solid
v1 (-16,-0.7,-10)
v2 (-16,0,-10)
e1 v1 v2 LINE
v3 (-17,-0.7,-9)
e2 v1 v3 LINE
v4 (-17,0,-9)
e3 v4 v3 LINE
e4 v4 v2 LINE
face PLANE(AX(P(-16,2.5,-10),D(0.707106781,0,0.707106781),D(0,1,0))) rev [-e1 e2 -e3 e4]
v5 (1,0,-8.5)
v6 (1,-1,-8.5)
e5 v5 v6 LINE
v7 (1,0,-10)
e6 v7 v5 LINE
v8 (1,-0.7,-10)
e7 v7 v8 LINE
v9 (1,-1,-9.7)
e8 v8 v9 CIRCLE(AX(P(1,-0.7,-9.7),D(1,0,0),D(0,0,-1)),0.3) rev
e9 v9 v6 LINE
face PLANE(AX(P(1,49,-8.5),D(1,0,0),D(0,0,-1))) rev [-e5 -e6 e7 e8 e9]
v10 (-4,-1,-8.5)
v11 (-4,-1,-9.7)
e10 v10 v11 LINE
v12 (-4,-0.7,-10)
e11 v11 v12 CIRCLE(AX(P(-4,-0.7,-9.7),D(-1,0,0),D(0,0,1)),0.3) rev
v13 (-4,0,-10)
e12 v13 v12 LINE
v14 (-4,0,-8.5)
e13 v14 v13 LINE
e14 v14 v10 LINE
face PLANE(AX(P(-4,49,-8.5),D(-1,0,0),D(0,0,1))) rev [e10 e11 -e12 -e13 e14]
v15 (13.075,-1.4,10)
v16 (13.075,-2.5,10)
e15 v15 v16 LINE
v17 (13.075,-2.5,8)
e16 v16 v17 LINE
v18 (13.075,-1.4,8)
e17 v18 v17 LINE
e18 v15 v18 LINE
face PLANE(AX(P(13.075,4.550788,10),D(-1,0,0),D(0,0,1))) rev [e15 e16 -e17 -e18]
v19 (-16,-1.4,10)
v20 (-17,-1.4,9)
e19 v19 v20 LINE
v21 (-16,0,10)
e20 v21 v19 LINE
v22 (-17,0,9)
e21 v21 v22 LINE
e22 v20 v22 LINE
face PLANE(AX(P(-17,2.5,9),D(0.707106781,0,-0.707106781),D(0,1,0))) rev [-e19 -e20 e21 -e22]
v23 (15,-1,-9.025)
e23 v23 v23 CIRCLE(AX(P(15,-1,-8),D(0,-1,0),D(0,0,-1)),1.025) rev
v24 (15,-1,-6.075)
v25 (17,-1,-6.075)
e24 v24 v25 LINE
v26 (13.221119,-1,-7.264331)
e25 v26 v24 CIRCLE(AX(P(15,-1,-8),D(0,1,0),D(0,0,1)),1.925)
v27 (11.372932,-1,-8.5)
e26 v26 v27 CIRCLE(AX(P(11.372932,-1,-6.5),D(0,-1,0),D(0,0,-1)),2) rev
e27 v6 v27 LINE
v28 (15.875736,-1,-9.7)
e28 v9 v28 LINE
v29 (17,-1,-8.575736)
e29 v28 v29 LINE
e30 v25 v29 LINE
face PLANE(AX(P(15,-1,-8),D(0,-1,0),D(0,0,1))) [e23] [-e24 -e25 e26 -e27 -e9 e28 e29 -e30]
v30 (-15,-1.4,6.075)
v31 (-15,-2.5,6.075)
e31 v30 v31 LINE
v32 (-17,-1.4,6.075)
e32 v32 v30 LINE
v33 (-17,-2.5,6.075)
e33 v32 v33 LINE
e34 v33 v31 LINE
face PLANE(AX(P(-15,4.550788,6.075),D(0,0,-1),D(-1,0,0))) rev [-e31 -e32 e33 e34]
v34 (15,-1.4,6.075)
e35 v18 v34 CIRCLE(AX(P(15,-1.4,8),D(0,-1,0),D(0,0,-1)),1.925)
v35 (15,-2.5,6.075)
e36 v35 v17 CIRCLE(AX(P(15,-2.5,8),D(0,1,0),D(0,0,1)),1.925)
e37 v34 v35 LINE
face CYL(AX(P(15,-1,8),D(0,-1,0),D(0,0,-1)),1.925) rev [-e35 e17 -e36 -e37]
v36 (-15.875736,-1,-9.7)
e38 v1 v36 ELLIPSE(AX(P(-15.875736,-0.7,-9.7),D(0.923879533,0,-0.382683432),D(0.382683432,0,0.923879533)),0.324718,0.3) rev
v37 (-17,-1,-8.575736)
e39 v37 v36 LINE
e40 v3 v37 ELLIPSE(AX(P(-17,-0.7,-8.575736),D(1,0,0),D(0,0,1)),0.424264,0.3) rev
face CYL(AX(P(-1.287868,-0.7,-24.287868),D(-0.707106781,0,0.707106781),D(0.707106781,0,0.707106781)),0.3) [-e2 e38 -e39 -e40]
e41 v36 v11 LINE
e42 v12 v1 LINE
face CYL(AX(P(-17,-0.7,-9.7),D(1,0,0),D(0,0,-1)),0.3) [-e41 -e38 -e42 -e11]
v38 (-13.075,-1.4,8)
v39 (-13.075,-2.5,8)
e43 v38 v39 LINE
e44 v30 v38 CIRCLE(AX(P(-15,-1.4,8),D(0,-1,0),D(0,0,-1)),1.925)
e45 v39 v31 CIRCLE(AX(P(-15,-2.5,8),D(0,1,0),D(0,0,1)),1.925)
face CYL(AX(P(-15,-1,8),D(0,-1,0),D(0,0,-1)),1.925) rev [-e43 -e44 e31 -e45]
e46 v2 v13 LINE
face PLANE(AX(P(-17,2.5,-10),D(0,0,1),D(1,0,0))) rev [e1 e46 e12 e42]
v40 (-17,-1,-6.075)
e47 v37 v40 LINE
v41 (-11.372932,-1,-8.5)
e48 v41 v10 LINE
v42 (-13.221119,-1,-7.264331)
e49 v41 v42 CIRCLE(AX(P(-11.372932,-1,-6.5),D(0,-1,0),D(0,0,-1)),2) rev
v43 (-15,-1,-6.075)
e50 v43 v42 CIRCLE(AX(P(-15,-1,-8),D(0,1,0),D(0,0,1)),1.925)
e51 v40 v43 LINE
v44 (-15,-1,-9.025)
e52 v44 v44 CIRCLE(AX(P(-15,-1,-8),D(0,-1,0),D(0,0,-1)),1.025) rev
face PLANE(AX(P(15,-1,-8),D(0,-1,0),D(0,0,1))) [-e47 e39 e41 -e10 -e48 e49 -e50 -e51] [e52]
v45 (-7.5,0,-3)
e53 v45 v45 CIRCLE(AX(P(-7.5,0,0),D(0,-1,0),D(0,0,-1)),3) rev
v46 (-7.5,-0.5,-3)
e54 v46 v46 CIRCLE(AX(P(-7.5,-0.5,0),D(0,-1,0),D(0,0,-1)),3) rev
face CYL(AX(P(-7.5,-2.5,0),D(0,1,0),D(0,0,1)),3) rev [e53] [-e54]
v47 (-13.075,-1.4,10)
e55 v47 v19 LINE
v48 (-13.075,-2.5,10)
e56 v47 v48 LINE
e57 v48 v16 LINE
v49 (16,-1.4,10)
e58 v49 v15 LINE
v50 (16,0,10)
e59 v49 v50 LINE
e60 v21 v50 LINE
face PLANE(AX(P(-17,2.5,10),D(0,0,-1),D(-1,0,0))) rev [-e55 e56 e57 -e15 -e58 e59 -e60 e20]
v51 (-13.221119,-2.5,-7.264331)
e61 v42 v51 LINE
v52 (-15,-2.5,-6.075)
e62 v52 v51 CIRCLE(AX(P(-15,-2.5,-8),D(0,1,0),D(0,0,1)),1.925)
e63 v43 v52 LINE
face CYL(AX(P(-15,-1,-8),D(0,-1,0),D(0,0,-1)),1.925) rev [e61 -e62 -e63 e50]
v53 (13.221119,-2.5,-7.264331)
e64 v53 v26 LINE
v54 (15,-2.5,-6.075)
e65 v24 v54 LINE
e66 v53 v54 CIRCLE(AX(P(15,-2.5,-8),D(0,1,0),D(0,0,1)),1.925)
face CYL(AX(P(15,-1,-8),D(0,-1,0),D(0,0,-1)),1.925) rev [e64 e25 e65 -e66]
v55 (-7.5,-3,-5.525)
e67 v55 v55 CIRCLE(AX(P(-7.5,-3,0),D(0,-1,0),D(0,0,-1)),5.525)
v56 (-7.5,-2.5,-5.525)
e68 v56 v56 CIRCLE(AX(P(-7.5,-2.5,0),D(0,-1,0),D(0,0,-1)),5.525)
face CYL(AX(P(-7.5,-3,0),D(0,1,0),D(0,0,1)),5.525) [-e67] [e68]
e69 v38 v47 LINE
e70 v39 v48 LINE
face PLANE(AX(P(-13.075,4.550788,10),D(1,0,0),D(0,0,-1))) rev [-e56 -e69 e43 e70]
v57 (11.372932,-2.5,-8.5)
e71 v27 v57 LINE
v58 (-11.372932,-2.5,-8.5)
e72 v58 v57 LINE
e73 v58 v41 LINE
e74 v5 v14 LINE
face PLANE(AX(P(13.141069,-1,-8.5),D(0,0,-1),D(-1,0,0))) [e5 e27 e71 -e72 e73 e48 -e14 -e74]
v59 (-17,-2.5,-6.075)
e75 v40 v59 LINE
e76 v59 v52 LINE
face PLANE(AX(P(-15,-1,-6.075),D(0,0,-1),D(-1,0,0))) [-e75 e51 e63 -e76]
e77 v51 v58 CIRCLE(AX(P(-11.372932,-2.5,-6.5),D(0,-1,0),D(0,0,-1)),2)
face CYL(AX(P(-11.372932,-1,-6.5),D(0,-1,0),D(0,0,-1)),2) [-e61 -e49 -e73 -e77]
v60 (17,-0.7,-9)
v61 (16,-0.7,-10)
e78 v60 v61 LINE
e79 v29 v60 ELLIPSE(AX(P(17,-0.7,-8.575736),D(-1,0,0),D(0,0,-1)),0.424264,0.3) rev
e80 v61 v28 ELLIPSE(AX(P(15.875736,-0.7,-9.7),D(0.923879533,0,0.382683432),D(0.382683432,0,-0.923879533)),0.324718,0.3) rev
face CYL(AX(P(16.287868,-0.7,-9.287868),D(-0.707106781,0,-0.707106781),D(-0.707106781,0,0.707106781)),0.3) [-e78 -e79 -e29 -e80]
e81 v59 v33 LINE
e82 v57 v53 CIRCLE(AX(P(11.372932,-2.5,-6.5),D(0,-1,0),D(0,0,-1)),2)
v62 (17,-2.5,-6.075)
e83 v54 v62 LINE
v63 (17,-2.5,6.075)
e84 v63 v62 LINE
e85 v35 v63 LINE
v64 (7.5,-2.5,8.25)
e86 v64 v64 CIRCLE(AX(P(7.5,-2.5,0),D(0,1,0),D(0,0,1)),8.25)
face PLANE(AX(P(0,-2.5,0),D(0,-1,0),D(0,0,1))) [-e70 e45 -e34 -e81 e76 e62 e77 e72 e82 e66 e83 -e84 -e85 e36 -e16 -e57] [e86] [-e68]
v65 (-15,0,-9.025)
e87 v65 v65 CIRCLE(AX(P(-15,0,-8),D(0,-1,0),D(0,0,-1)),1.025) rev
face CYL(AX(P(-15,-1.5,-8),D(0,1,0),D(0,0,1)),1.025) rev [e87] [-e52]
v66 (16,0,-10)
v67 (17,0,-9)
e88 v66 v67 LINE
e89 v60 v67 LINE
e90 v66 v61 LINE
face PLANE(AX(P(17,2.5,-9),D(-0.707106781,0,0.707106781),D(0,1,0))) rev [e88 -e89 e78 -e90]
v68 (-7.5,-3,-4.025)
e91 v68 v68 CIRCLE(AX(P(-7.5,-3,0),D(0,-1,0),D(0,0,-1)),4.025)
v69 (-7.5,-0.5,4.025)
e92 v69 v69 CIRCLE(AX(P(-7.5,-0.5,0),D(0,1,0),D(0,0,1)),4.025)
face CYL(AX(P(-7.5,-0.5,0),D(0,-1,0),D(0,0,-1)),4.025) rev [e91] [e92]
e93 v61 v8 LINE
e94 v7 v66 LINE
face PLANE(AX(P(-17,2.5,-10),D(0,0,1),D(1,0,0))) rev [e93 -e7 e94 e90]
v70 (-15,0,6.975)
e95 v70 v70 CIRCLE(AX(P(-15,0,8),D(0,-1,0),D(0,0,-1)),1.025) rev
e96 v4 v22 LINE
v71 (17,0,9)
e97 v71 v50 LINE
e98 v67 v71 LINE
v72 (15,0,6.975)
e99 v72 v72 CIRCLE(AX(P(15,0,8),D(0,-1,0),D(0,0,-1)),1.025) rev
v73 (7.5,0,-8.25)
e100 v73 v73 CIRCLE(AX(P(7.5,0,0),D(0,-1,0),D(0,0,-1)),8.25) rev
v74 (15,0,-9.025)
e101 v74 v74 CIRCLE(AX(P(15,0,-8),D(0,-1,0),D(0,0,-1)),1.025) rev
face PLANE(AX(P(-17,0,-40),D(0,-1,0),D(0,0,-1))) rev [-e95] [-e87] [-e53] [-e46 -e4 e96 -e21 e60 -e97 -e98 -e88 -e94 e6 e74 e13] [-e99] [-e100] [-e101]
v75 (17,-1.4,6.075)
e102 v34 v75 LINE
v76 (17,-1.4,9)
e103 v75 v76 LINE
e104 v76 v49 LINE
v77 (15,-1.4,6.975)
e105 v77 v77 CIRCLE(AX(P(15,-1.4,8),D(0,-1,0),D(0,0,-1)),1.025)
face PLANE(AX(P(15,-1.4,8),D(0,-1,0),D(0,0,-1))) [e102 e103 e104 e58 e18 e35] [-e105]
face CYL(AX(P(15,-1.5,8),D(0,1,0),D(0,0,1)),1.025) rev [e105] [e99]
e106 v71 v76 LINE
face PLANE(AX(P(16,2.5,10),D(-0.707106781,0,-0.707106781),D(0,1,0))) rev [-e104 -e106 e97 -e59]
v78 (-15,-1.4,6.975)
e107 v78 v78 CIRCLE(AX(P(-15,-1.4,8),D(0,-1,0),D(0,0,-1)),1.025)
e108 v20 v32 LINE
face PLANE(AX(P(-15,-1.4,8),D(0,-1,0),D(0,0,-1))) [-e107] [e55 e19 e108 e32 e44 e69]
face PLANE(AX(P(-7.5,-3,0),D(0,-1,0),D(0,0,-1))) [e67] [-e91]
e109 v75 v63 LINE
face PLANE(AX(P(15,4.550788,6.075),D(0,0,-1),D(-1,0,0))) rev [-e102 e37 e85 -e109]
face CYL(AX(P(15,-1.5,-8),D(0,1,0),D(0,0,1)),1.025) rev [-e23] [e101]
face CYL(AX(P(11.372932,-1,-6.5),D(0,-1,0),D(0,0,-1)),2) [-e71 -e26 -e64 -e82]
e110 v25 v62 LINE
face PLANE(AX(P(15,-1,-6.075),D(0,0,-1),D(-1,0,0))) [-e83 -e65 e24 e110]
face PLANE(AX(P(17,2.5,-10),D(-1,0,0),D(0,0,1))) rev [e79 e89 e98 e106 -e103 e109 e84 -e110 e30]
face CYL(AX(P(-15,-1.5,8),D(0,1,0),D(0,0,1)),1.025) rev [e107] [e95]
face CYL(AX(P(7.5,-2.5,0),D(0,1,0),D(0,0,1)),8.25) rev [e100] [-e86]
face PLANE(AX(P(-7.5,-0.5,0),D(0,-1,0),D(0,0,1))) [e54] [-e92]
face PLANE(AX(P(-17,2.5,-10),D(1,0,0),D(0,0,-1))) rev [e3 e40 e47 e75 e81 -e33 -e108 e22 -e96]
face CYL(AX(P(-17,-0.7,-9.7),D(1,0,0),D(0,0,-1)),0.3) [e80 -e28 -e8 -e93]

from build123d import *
from build123d.topology import SkipClean

# Parameters (mm, degrees)
SKETCH1_W                = 34
SKETCH1_H                = 20
BOSS_EXTRUDE1_DEPTH      = 2.5
SKETCH2_R                = 3
SKETCH2_R_2              = 8.25
CUT_EXTRUDE1_DEPTH       = 5
SKETCH5_R                = 4.025
CUT_EXTRUDE4_DEPTH       = 2
SKETCH3_R                = 1.025
CUT_EXTRUDE2_DEPTH       = 4
SKETCH4_R                = 1.925
CUT_EXTRUDE3_DEPTH       = 1.5
CUT_EXTRUDE5_DEPTH       = 1.5
FILLET1_R                = 2
CHAMFER1_SIZE            = 1
FILLET2_R                = 0.3
FILLET1_OF_MIRROR1_R     = 2
CHAMFER1_OF_MIRROR1_SIZE = 1
FILLET2_OF_MIRROR1_R     = 0.3
SKETCH7_W                = 34
SKETCH7_H                = 2.5
CUT_EXTRUDE6_DEPTH       = 50
SKETCH8_W                = 5
SKETCH8_H                = 1.5
CUT_EXTRUDE7_DEPTH       = 50
BOSS_EXTRUDE2_START      = 0.5
SKETCH9_R                = 5.525
SKETCH9_R_2              = 4.025
BOSS_EXTRUDE2_DEPTH      = 0.5
CUT_EXTRUDE8_DEPTH       = 1.5
BOSS_EXTRUDE3_START      = 0.4
SKETCH11_R               = 1.025
BOSS_EXTRUDE3_DEPTH      = 0.4


with BuildPart() as part:
    # Sketch1 → Boss-Extrude1 (new body)
    with BuildSketch(Plane(origin=(0, 0, 0), x_dir=(1, 0, 0), z_dir=(0, 1, 0))):
        Rectangle(SKETCH1_W, SKETCH1_H)
    boss_extrude1 = extrude(amount=BOSS_EXTRUDE1_DEPTH)

    # Sketch2 → Cut-Extrude1 (cut)
    with BuildSketch(Plane(origin=(0, 2.5, 0), x_dir=(1, 0, 0), z_dir=(0, 1, 0))):
        with Locations(Location((-7.5, 0, 0), (0, 0, 270))):
            Circle(SKETCH2_R)
        with Locations(Location((7.5, 0, 0), (0, 0, 270))):
            Circle(SKETCH2_R_2)
    cut_extrude1 = extrude(amount=-CUT_EXTRUDE1_DEPTH, mode=Mode.SUBTRACT)

    # Sketch5 → Cut-Extrude4 (cut)
    with BuildSketch(Plane(origin=(0, 2.5, 0), x_dir=(1, 0, 0), z_dir=(0, 1, 0))):
        with Locations(Location((-7.5, 0, 0), (0, 0, 270))):
            Circle(SKETCH5_R)
    cut_extrude4 = extrude(amount=-CUT_EXTRUDE4_DEPTH, mode=Mode.SUBTRACT)

    # Sketch3 → Cut-Extrude2 (cut)
    with BuildSketch(Plane(origin=(0, 2.5, 0), x_dir=(1, 0, 0), z_dir=(0, 1, 0))):
        with Locations(Location((15, 8, 0), (0, 0, 270))):
            Circle(SKETCH3_R)
        with Locations(Location((-15, 8, 0), (0, 0, 270))):
            Circle(SKETCH3_R)
        with Locations(Location((-15, -8, 0), (0, 0, 270))):
            Circle(SKETCH3_R)
        with Locations(Location((15, -8, 0), (0, 0, 270))):
            Circle(SKETCH3_R)
    cut_extrude2 = extrude(amount=-CUT_EXTRUDE2_DEPTH, mode=Mode.SUBTRACT)

    # Sketch4 → Cut-Extrude3 (cut)
    with BuildSketch(Plane(origin=(0, 2.5, 0), x_dir=(1, 0, 0), z_dir=(0, 1, 0))):
        with Locations(Location((-15, 8, 0), (0, 0, 270))):
            Circle(SKETCH4_R)
        with Locations(Location((-15, -8, 0), (0, 0, 270))):
            Circle(SKETCH4_R)
        with Locations(Location((15, 8, 0), (0, 0, 270))):
            Circle(SKETCH4_R)
        with Locations(Location((15, -8, 0), (0, 0, 270))):
            Circle(SKETCH4_R)
    cut_extrude3 = extrude(amount=-CUT_EXTRUDE3_DEPTH, mode=Mode.SUBTRACT)

    # Sketch6 → Cut-Extrude5 (cut)
    with BuildSketch(Plane(origin=(0, 2.5, 0), x_dir=(1, 0, 0), z_dir=(0, 1, 0))):
        with BuildLine():
            Line((17, 10), (-17, 10))
            Line((-17, 10), (-17, 6.075))
            Line((-17, 6.075), (-15, 6.075))
            ThreePointArc((-15, 6.075), (-13.472236111, 6.828862732), (-13.141068855, 8.5))
            Line((-13.141068855, 8.5), (13.141068855, 8.5))
            ThreePointArc((13.141068855, 8.5), (13.472236111, 6.828862732), (15, 6.075))
            Line((15, 6.075), (17, 6.075))
            Line((17, 6.075), (17, 10))
        make_face()
    cut_extrude5 = extrude(amount=-CUT_EXTRUDE5_DEPTH, mode=Mode.SUBTRACT)

    # Fillet1
    fillet1_edges = [part.edges().sort_by_distance(p)[0] for p in [
        (13.141068855, 1.75, -8.5),
        (-13.141068855, 1.75, -8.5),
    ]]
    fillet(fillet1_edges, radius=FILLET1_R)

    # Chamfer1
    chamfer1_edges = [part.edges().sort_by_distance(p)[0] for p in [
        (17, 1.25, 10),
        (-17, 1.25, 10),
        (-17, 0.5, -10),
        (17, 0.5, -10),
    ]]
    chamfer(chamfer1_edges, length=CHAMFER1_SIZE)

    # Fillet2
    fillet2_edges = [part.edges().sort_by_distance(p)[0] for p in [
        (0, 1, -10),
        (16.5, 1, -9.5),
        (-16.5, 1, -9.5),
    ]]
    fillet(fillet2_edges, radius=FILLET2_R)


with BuildPart() as mirror1_1:
    # Mirror1: Boss-Extrude1 across plane
    add(boss_extrude1.mirror(Plane.ZX))

    # Mirror1 2: Cut-Extrude1, Cut-Extrude4, Cut-Extrude2, Cut-Extrude3, Cut-Extrude5 across plane
    add(cut_extrude1.mirror(Plane.ZX), mode=Mode.SUBTRACT)
    add(cut_extrude4.mirror(Plane.ZX), mode=Mode.SUBTRACT)
    add(cut_extrude2.mirror(Plane.ZX), mode=Mode.SUBTRACT)
    add(cut_extrude3.mirror(Plane.ZX), mode=Mode.SUBTRACT)
    add(cut_extrude5.mirror(Plane.ZX), mode=Mode.SUBTRACT)

    # Fillet1 of Mirror1
    fillet1_of_mirror1_edges = [mirror1_1.edges().sort_by_distance(p)[0] for p in [
        (13.141068855, -1.75, -8.5),
        (-13.141068855, -1.75, -8.5),
    ]]
    fillet(fillet1_of_mirror1_edges, radius=FILLET1_OF_MIRROR1_R)

    # Chamfer1 of Mirror1
    chamfer1_of_mirror1_edges = [mirror1_1.edges().sort_by_distance(p)[0] for p in [
        (17, -1.25, 10),
        (-17, -1.25, 10),
        (-17, -0.5, -10),
        (17, -0.5, -10),
    ]]
    chamfer(chamfer1_of_mirror1_edges, length=CHAMFER1_OF_MIRROR1_SIZE)

    # Fillet2 of Mirror1
    fillet2_of_mirror1_edges = [mirror1_1.edges().sort_by_distance(p)[0] for p in [
        (0, -1, -10),
        (16.5, -1, -9.5),
        (-16.5, -1, -9.5),
    ]]
    fillet(fillet2_of_mirror1_edges, radius=FILLET2_OF_MIRROR1_R)


with BuildPart() as part_1:
    add(part.part)

    # Mirror1 united with what the copies touc: union Mirror1_1
    add(mirror1_1.part)

    # Sketch7 → Cut-Extrude6 (cut)
    with BuildSketch(Plane.XY.offset(10)):
        with Locations((0, 1.25)):
            Rectangle(SKETCH7_W, SKETCH7_H)
    extrude(amount=-CUT_EXTRUDE6_DEPTH, mode=Mode.SUBTRACT)

    # Sketch8 → Cut-Extrude7 (cut)
    with BuildSketch(Plane.XZ.offset(1)):
        with Locations((-1.5, -9.25)):
            Rectangle(SKETCH8_W, SKETCH8_H)
    extrude(amount=-CUT_EXTRUDE7_DEPTH, mode=Mode.SUBTRACT)

    # Sketch9 → Boss-Extrude2 (add)
    with SkipClean():  # the faces are left unmerged after this step: merging them gives an invalid solid
        with BuildSketch(Plane.XZ.offset(2.5).offset(BOSS_EXTRUDE2_START)):
            with Locations(Location((-7.5, 0, 0), (0, 0, 270))):
                Circle(SKETCH9_R)
            with Locations(Location((-7.5, 0, 0), (0, 0, 270))):
                Circle(SKETCH9_R_2, mode=Mode.SUBTRACT)
        extrude(amount=-BOSS_EXTRUDE2_DEPTH)

    # Sketch10 → Cut-Extrude8 (cut)
    with BuildSketch(Plane.XZ.offset(2.5)):
        with BuildLine():
            Line((-15, 6.075), (-17, 6.075))
            Line((-17, 6.075), (-17, 9))
            Line((-17, 9), (-16, 10))
            Line((-16, 10), (-13.075, 10))
            Line((-13.075, 10), (-13.075, 8))
            ThreePointArc((-13.075, 8), (-16.361180554, 9.361180554), (-15, 6.075))
        make_face()
        with BuildLine():
            Line((13.075, 10), (13.075, 8))
            ThreePointArc((13.075, 8), (16.361180554, 9.361180554), (15, 6.075))
            Line((15, 6.075), (17, 6.075))
            Line((17, 6.075), (17, 9))
            Line((17, 9), (16, 10))
            Line((16, 10), (13.075, 10))
        make_face()
    extrude(amount=-CUT_EXTRUDE8_DEPTH, mode=Mode.SUBTRACT)

    # Sketch11 → Boss-Extrude3 (add)
    # profile 1 of 2: a face of its own
    with SkipClean():  # the faces are left unmerged after this step: merging them gives an invalid solid
        with BuildSketch(Plane.XZ.offset(1).offset(BOSS_EXTRUDE3_START)):
            with BuildLine():
                Line((-13.075, 8), (-13.075, 10))
                Line((-13.075, 10), (-16, 10))
                Line((-16, 10), (-17, 9))
                Line((-17, 9), (-17, 6.075))
                Line((-17, 6.075), (-15, 6.075))
                ThreePointArc((-15, 6.075), (-13.638819446, 6.638819446), (-13.075, 8))
            make_face()
            with Locations(Location((-15, 8, 0), (0, 0, 270))):
                Circle(SKETCH11_R, mode=Mode.SUBTRACT)
        # profile 2 of 2: a face of its own
        with BuildSketch(Plane.XZ.offset(1).offset(BOSS_EXTRUDE3_START)):
            with BuildLine():
                Line((15, 6.075), (17, 6.075))
                Line((17, 6.075), (17, 9))
                Line((17, 9), (16, 10))
                Line((16, 10), (13.075, 10))
                Line((13.075, 10), (13.075, 8))
                ThreePointArc((13.075, 8), (13.638819446, 6.638819446), (15, 6.075))
            make_face()
            with Locations(Location((15, 8, 0), (0, 0, 270))):
                Circle(SKETCH11_R, mode=Mode.SUBTRACT)
        extrude(amount=-BOSS_EXTRUDE3_DEPTH)


solid = part_1.part
